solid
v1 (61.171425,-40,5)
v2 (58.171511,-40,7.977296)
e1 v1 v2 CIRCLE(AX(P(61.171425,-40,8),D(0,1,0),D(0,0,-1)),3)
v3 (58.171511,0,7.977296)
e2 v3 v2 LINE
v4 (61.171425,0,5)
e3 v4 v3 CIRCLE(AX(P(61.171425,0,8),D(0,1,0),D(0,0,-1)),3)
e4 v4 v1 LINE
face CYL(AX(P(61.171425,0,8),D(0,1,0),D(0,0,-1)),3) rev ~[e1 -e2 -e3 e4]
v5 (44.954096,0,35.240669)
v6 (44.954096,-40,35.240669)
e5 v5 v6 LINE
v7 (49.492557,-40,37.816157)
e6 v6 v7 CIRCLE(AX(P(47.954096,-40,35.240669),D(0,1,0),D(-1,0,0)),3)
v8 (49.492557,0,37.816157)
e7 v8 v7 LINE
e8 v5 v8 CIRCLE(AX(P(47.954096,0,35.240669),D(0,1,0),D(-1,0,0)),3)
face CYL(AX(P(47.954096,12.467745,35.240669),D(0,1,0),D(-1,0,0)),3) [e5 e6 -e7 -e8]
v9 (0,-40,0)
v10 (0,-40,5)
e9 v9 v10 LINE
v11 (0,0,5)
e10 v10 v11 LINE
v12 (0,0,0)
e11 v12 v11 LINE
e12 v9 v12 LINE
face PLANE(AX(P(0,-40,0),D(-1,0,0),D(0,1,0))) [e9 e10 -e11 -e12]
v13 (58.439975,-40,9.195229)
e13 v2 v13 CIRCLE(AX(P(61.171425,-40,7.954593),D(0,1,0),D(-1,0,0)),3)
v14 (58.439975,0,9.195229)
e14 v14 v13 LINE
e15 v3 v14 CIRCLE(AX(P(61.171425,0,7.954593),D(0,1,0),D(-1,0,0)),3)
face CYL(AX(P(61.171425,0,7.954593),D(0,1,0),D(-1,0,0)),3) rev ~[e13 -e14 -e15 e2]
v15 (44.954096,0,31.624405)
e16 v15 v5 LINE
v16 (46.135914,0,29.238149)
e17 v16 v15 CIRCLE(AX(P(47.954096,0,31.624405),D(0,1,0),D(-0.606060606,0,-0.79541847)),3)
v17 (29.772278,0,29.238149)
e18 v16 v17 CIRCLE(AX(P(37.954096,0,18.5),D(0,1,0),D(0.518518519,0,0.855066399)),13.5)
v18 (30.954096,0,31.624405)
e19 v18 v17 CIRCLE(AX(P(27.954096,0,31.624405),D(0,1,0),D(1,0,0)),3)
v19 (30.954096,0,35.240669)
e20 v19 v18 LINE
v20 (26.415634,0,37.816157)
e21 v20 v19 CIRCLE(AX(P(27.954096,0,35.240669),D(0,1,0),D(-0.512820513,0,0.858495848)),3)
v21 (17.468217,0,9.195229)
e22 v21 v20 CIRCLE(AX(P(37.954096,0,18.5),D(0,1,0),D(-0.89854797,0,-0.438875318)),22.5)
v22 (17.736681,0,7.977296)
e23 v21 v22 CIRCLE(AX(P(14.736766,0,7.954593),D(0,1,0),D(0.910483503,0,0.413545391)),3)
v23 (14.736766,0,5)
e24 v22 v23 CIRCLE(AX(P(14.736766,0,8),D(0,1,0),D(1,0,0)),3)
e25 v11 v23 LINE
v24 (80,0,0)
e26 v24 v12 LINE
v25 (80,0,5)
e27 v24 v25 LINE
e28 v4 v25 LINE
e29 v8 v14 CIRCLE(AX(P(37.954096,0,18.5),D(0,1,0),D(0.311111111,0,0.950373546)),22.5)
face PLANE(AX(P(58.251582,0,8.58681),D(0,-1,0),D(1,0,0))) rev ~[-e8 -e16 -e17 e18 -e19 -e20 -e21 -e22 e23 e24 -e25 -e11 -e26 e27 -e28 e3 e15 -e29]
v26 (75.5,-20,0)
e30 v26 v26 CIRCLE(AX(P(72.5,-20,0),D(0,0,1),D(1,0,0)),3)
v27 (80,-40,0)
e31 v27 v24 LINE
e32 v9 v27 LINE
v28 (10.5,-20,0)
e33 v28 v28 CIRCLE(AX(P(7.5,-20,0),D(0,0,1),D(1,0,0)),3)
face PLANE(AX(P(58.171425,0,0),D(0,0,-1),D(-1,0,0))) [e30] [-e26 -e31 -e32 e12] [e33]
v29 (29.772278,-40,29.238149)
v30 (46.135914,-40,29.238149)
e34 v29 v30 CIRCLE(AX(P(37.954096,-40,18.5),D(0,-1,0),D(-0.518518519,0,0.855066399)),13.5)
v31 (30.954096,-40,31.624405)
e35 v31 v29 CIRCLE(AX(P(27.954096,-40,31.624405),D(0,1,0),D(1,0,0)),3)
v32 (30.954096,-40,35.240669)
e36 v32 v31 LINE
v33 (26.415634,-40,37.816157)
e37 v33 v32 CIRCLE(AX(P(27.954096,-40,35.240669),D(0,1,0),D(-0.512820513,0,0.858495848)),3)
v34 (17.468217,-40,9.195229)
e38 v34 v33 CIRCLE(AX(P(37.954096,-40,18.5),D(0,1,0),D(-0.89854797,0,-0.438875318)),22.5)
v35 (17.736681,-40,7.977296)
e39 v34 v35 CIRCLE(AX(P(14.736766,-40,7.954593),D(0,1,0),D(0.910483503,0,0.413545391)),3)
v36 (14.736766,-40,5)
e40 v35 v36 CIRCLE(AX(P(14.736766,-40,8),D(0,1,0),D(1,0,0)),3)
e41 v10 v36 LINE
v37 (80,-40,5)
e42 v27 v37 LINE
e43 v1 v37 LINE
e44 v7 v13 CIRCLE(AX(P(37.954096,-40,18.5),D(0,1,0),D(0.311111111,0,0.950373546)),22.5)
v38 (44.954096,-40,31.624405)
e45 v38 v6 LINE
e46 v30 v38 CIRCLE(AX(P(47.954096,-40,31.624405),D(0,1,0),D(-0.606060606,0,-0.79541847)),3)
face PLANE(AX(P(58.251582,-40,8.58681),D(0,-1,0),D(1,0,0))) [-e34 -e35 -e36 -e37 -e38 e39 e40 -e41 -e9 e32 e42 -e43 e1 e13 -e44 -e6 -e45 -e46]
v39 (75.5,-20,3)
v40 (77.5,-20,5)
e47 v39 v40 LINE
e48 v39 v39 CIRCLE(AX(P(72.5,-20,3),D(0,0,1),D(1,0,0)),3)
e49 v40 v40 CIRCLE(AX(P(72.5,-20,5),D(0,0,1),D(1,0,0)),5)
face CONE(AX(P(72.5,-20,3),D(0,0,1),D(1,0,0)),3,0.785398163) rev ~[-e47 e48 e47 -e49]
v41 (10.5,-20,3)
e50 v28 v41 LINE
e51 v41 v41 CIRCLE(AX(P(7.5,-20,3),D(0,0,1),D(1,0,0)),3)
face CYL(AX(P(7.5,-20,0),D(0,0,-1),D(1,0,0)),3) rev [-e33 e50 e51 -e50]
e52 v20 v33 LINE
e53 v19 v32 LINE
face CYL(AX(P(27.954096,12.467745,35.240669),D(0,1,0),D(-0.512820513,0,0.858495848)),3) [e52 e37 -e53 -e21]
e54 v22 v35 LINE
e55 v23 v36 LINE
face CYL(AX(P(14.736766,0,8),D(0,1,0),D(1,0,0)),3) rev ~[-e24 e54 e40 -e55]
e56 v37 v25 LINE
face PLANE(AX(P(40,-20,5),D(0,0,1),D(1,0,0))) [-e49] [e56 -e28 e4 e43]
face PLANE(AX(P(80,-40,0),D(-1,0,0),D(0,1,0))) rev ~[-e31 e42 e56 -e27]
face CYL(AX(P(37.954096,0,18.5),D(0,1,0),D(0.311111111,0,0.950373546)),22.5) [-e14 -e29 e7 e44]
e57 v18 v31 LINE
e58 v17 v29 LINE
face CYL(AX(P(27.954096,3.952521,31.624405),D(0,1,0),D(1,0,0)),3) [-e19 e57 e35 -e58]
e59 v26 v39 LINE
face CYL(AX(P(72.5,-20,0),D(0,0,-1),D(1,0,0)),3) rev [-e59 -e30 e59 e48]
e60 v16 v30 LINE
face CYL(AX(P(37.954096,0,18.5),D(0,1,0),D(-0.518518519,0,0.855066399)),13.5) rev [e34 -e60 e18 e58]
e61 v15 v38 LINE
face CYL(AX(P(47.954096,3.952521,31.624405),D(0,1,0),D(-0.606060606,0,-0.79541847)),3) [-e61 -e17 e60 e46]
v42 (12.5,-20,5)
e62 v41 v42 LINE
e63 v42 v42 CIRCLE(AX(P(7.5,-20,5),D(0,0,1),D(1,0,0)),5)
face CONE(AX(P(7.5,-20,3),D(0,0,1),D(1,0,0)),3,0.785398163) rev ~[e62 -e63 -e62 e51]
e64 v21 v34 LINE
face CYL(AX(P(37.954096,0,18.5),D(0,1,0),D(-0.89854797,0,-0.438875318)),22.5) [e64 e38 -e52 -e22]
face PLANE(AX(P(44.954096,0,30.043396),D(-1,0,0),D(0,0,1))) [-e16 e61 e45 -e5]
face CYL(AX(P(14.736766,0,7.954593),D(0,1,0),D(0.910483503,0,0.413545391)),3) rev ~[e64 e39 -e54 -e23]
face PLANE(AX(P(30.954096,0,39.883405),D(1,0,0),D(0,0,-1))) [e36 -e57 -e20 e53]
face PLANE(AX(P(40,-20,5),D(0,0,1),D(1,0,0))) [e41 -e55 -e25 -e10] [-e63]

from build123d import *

# Parameters (mm, degrees)
F0_W        = 80
F0_H        = 40
F0_R        = 3
F0_W_2      = 50
F0_H_2      = 30
F1_DEPTH    = 5
F2_SIZE     = 2
F6_DEPTH    = 40
F7_T1_DEPTH = 40
F7_T3_DEPTH = 64.9354908843
F7_T5_DEPTH = 47.905041839


# Not quite as in the source:
# - a fillet or chamfer that OpenCascade refuses, or shapes differently, is made with other operations: its cross-section is extruded or revolved along the edge and cut away or added


with BuildPart() as f1:
    # F0 (on Top) → F1 (new body)
    with BuildSketch(Plane.XY):
        with Locations((40, -20)):
            Rectangle(F0_W, F0_H)
        with Locations((7.5, -20)):
            Circle(F0_R, mode=Mode.SUBTRACT)
        with Locations((40, -20)):
            Rectangle(F0_W_2, F0_H_2, mode=Mode.SUBTRACT)
        with Locations((72.5, -20)):
            Circle(F0_R, mode=Mode.SUBTRACT)
        with Locations((40, -20)):
            Rectangle(F0_W_2, F0_H_2)
    extrude(amount=F1_DEPTH)

    # F2
    f2_edges = [f1.edges().sort_by_distance(p)[0] for p in [
        (4.5, -20, 5),
        (69.5, -20, 5),
    ]]
    chamfer(f2_edges, length=F2_SIZE)

    # F5 (on plane+point) → F6 (join)
    with BuildSketch(Plane(origin=(0, 0, 0), x_dir=(-1, 0, 0), z_dir=(0, 1, 0))):
        with BuildLine():
            ThreePointArc((-30.954095751, 30.0433963806), (-37.954095751, 5), (-44.954095751, 30.0433963806))
            Line((-44.954095751, 30.0433963806), (-44.954095751, 39.8834047803))
            ThreePointArc((-44.954095751, 39.8834047803), (-58.6775836128, 27.2628220822), (-58.1714250849, 8.625305341))
            Line((-58.1714250849, 8.625305341), (-58.1714250849, 0))
            Line((-58.1714250849, 0), (-17.7367664172, 0))
            Line((-17.7367664172, 0), (-17.7367664172, 8.625305341))
            ThreePointArc((-17.7367664172, 8.625305341), (-17.2306078893, 27.2628220822), (-30.954095751, 39.8834047803))
            Line((-30.954095751, 39.8834047803), (-30.954095751, 30.0433963806))
        make_face()
    extrude(amount=-F6_DEPTH)

    # F7: fillet of radius 3 on 8 edges, made by hand

    # F7_s2 → F7_t1 (join)
    with BuildSketch(Plane.XZ):
        with BuildLine():
            ThreePointArc((58.1714250849, 7.9545925349), (58.2393309928, 8.5892768936), (58.439974575, 9.1952287073))
            ThreePointArc((58.439974575, 9.1952287073), (58.3076947386, 8.9093270176), (58.1714250849, 8.625305341))
            Line((58.1714250849, 8.625305341), (58.1714250849, 7.9545925349))
        make_face()
        with BuildLine():
            ThreePointArc((61.1714250849, 5), (59.0501047413, 5.8786796564), (58.1714250849, 8))
            Line((58.1714250849, 8), (58.1714250849, 5))
            Line((58.1714250849, 5), (61.1714250849, 5))
        make_face()
        with BuildLine():
            ThreePointArc((17.4682169271, 9.1952287073), (17.6688605093, 8.5892768936), (17.7367664172, 7.9545925349))
            Line((17.7367664172, 7.9545925349), (17.7367664172, 8.625305341))
            ThreePointArc((17.7367664172, 8.625305341), (17.6004967635, 8.9093270176), (17.4682169271, 9.1952287073))
        make_face()
        with BuildLine():
            ThreePointArc((17.7367664172, 8), (16.8580867608, 5.8786796564), (14.7367664172, 5))
            Line((14.7367664172, 5), (17.7367664172, 5))
            Line((17.7367664172, 5), (17.7367664172, 8))
        make_face()
    extrude(amount=F7_T1_DEPTH)

    # F7_s4 → F7_t3 (cut)
    with BuildSketch(Plane.XZ.offset(-12.4677454421)):
        with BuildLine():
            ThreePointArc((44.954095751, 35.2406690428), (46.4734514007, 37.8498245207), (49.4925572895, 37.8161565878))
            ThreePointArc((49.4925572895, 37.8161565878), (47.2807788606, 38.9759122428), (44.954095751, 39.8834047803))
            Line((44.954095751, 39.8834047803), (44.954095751, 35.2406690428))
        make_face()
        with BuildLine():
            ThreePointArc((26.4156342126, 37.8161565878), (29.4347401014, 37.8498245207), (30.954095751, 35.2406690428))
            Line((30.954095751, 35.2406690428), (30.954095751, 39.8834047803))
            ThreePointArc((30.954095751, 39.8834047803), (28.6274126415, 38.9759122428), (26.4156342126, 37.8161565878))
        make_face()
    extrude(amount=F7_T3_DEPTH, mode=Mode.SUBTRACT)

    # F7_s6 → F7_t5 (cut)
    with BuildSketch(Plane.XZ.offset(-3.9525209195)):
        with BuildLine():
            ThreePointArc((46.1359139329, 29.2381493396), (45.2657370088, 30.2929667015), (44.954095751, 31.6244047484))
            Line((44.954095751, 31.6244047484), (44.954095751, 30.0433963806))
            ThreePointArc((44.954095751, 30.0433963806), (45.5556749637, 29.6564328293), (46.1359139329, 29.2381493396))
        make_face()
        with BuildLine():
            ThreePointArc((30.954095751, 31.6244047484), (30.6424544933, 30.2929667015), (29.7722775692, 29.2381493396))
            ThreePointArc((29.7722775692, 29.2381493396), (30.3525165384, 29.6564328293), (30.954095751, 30.0433963806))
            Line((30.954095751, 30.0433963806), (30.954095751, 31.6244047484))
        make_face()
    extrude(amount=F7_T5_DEPTH, mode=Mode.SUBTRACT)


solid = f1.part
